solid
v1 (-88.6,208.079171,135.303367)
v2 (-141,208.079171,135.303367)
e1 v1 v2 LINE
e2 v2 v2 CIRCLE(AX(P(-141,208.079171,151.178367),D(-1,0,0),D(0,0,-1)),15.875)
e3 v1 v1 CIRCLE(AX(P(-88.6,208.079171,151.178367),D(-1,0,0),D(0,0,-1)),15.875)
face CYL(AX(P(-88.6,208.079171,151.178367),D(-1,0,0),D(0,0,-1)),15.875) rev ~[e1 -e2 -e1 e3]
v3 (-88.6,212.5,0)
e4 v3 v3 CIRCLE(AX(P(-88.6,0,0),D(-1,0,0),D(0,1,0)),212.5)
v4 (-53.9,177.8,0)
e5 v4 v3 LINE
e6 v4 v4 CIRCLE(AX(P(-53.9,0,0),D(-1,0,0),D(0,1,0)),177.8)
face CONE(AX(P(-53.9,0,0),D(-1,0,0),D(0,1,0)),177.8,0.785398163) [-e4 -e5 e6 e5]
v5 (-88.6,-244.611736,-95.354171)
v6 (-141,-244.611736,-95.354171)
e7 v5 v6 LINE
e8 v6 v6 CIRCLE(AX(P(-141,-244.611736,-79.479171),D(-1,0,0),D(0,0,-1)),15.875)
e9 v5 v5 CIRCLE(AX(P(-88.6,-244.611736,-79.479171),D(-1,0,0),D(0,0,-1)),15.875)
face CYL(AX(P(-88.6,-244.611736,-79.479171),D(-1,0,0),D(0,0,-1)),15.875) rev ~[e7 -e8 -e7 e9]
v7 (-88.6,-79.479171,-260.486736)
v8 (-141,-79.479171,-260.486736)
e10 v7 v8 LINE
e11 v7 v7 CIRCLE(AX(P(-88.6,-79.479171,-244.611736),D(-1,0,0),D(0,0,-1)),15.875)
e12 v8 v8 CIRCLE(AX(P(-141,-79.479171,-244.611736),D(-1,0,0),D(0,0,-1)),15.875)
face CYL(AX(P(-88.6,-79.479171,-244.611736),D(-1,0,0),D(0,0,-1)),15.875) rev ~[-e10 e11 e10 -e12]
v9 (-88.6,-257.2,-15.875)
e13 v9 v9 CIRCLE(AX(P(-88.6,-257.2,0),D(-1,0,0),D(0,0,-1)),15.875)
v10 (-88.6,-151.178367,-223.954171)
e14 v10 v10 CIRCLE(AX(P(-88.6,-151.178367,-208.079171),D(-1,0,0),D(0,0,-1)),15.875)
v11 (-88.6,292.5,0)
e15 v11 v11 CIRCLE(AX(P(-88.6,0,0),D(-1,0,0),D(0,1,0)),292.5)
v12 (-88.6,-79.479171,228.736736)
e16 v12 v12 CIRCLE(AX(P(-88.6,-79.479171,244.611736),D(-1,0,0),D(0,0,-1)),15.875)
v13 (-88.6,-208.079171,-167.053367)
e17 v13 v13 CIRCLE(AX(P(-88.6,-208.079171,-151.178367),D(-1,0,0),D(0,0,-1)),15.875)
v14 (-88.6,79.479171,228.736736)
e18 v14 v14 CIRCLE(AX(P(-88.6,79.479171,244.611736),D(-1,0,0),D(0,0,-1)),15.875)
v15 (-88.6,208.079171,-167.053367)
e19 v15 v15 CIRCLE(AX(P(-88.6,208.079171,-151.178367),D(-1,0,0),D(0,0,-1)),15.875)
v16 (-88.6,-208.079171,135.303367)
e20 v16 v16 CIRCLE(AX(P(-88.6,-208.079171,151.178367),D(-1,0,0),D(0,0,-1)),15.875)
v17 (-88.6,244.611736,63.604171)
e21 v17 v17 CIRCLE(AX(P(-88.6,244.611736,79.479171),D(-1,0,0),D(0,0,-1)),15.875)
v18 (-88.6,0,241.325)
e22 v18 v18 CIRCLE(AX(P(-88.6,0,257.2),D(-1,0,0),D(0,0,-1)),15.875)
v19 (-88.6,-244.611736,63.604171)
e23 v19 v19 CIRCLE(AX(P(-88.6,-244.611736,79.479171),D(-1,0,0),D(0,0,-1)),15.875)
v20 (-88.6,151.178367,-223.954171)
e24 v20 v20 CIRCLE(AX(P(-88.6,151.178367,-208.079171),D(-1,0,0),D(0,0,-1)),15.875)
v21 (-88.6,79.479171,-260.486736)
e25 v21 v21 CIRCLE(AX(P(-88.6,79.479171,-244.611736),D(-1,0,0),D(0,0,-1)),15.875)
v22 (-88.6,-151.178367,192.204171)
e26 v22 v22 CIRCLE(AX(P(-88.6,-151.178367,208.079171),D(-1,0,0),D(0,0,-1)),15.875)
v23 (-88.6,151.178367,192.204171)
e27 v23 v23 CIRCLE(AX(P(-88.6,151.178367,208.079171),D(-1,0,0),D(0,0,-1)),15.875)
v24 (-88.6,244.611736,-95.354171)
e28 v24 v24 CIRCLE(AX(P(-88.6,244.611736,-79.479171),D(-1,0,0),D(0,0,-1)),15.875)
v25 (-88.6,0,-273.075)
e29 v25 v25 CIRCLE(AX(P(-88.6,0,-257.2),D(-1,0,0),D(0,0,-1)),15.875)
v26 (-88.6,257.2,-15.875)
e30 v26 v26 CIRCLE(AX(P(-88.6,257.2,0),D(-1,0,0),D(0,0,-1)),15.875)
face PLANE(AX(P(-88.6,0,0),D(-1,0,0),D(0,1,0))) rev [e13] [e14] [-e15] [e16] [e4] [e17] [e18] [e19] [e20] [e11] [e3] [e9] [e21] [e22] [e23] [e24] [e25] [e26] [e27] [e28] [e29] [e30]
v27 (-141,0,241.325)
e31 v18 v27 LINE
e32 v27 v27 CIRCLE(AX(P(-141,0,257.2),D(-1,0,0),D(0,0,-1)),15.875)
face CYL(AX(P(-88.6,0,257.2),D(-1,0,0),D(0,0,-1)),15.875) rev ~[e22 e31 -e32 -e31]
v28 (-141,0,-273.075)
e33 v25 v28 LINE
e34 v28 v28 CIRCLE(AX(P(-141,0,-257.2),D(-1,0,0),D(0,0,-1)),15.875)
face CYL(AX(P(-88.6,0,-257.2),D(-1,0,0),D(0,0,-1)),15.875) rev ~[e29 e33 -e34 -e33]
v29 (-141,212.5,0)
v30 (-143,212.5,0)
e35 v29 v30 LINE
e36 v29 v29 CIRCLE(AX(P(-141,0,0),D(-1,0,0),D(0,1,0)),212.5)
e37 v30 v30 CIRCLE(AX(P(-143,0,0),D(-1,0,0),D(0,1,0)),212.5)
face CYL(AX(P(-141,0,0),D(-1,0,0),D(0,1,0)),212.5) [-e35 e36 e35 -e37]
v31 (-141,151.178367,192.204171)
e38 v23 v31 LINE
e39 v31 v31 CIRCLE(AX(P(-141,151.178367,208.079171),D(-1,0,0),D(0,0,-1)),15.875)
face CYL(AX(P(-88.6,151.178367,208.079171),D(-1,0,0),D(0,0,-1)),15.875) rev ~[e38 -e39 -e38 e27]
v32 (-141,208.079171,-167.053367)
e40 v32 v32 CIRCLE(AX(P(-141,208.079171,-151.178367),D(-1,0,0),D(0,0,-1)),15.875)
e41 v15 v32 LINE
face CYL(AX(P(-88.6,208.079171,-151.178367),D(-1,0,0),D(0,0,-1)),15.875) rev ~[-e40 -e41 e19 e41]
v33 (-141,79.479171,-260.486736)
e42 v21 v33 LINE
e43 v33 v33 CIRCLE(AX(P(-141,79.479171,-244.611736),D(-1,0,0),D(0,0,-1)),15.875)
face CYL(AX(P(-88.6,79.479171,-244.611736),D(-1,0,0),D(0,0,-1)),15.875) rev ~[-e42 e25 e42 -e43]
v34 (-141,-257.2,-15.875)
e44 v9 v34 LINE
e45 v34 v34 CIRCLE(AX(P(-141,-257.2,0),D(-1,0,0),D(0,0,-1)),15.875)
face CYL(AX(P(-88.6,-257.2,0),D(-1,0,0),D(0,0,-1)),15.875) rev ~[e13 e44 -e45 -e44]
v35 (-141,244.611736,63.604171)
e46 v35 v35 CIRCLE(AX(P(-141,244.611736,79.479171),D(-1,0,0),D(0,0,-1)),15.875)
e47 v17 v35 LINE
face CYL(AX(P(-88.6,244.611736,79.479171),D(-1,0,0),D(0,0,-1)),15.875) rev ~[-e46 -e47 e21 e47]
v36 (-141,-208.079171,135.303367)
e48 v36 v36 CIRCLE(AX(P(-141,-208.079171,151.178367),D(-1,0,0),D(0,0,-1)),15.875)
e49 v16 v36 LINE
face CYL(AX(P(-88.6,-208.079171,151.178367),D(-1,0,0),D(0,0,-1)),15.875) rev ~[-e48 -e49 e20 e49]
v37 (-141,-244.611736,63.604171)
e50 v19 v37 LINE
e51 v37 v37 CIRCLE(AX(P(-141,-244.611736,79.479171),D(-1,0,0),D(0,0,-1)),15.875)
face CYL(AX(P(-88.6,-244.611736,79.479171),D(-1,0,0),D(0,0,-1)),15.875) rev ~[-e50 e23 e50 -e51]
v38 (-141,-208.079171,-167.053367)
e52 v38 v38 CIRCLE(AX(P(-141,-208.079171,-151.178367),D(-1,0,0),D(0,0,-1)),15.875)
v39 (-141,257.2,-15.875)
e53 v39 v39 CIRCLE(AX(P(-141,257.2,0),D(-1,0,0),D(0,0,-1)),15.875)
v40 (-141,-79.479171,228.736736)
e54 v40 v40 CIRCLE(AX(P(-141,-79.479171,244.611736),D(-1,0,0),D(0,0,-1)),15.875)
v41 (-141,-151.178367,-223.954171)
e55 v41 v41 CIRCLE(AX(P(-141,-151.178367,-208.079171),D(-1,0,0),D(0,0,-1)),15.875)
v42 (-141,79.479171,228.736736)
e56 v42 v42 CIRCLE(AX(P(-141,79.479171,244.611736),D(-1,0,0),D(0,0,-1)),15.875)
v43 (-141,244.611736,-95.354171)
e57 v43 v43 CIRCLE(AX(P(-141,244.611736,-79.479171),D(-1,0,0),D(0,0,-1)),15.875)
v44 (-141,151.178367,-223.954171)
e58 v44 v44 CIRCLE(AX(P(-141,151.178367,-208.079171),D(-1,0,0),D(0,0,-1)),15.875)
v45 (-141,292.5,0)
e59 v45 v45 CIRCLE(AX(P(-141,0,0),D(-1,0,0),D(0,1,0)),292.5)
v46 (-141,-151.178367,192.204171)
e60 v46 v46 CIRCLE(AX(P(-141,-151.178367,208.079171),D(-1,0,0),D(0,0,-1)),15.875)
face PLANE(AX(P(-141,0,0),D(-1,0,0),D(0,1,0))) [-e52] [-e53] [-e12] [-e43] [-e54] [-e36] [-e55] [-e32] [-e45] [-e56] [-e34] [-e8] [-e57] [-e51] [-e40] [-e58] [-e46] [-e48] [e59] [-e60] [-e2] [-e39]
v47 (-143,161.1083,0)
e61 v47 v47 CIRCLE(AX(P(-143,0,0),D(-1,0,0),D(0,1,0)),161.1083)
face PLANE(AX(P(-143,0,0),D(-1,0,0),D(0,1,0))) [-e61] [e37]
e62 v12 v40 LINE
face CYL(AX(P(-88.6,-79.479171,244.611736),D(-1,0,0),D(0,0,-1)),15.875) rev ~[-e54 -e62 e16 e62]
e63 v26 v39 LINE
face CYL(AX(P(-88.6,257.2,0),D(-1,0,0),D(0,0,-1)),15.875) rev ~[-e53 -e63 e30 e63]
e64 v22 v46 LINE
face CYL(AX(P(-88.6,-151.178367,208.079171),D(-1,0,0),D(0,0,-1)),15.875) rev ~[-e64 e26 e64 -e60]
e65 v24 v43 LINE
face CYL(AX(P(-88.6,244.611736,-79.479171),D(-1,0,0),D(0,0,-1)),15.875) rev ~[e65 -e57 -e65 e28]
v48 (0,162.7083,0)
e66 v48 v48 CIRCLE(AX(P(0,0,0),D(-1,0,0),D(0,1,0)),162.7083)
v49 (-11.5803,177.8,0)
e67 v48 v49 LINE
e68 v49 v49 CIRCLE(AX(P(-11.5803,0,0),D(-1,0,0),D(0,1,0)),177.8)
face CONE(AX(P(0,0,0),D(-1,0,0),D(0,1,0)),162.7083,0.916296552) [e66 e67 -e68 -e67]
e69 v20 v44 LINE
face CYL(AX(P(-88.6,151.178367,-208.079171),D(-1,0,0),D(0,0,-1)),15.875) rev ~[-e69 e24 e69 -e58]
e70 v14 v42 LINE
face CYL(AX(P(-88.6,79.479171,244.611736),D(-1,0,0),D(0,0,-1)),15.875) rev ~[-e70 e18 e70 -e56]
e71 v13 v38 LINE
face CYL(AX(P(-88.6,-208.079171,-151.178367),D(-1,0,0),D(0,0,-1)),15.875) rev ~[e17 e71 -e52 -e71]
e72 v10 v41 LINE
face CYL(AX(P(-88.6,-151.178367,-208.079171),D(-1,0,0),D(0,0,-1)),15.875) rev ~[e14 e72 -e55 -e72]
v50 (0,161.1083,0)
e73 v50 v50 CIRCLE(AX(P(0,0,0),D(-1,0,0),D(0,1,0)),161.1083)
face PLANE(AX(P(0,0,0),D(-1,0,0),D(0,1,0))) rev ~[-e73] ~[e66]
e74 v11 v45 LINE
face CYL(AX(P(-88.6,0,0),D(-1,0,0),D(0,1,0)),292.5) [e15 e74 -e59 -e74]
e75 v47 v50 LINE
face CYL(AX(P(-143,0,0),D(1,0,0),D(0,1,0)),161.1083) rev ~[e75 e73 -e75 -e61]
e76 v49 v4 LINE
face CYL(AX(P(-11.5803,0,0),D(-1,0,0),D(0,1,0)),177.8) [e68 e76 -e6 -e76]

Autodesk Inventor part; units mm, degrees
ref_plane "YZ Plane" through (0, 0, 0) normal (1, 0, 0) x (0, 1, 0)
ref_plane "XZ Plane" through (0, 0, 0) normal (0, 1, 0) x (-1, 0, 0)
ref_plane "XY Plane" through (0, 0, 0) normal (0, 0, 1) x (1, 0, 0)
sketch "Sketch1" plane through (0, 0, 0) normal (0, 0, 1) x (1, 0, 0)
  line L0 (0, 0) -> (-156.093, 0)
  line L1 (0, 162.7083) -> (0, 161.1083)
  line L2 (0, 162.7083) -> (-11.5803, 177.8)
  line L3 (-11.5803, 177.8) -> (-53.9, 177.8)
  line L4 (-53.9, 177.8) -> (-88.6, 212.5)
  line L5 (-88.6, 212.5) -> (-88.6, 292.5)
  line L6 (-88.6, 292.5) -> (-141, 292.5)
  line L7 (-141, 292.5) -> (-141, 212.5)
  line L8 (-141, 212.5) -> (-143, 212.5)
  line L9 (-143, 212.5) -> (-143, 161.1083)
  line L10 (-143, 161.1083) -> (0, 161.1083)
  dimension "d0" = 37.5
  dimension "d2" = 2
  dimension "d3" = 52.4
  dimension "d4" = 585
  dimension "d5" = 322.2165
  dimension "d7" = 425
  dimension "d8" = 1.6
  dimension "d9" = 425
  dimension "d10" = 45
  dimension "d11" = 355.6
  dimension "d24" = 141
revolve "Revolution1" add sketch "Sketch1" angle 360 about axis through (0, 0, 0) along (-1, 0, 0)
sketch "Sketch2" plane through (-88.6, 0, 0) normal (1, 0, 0) x (0, 0, -1)
  point P0 (0, 0)
  point P1 (0, 257.2)
  dimension "d13" = 257.2
hole "Hole1" at (-88.6, 257.2, 0) direction (-1, 0, 0) diameter 31.75 end up to surface
pattern_circular "Circular Pattern1" count 20 over 360 about axis through (-71.5, 0, 0) along (1, 0, 0) of "Hole1"
properties part number "Weldneck Flange 14 in" material "ASTM A105 Gr.B"
